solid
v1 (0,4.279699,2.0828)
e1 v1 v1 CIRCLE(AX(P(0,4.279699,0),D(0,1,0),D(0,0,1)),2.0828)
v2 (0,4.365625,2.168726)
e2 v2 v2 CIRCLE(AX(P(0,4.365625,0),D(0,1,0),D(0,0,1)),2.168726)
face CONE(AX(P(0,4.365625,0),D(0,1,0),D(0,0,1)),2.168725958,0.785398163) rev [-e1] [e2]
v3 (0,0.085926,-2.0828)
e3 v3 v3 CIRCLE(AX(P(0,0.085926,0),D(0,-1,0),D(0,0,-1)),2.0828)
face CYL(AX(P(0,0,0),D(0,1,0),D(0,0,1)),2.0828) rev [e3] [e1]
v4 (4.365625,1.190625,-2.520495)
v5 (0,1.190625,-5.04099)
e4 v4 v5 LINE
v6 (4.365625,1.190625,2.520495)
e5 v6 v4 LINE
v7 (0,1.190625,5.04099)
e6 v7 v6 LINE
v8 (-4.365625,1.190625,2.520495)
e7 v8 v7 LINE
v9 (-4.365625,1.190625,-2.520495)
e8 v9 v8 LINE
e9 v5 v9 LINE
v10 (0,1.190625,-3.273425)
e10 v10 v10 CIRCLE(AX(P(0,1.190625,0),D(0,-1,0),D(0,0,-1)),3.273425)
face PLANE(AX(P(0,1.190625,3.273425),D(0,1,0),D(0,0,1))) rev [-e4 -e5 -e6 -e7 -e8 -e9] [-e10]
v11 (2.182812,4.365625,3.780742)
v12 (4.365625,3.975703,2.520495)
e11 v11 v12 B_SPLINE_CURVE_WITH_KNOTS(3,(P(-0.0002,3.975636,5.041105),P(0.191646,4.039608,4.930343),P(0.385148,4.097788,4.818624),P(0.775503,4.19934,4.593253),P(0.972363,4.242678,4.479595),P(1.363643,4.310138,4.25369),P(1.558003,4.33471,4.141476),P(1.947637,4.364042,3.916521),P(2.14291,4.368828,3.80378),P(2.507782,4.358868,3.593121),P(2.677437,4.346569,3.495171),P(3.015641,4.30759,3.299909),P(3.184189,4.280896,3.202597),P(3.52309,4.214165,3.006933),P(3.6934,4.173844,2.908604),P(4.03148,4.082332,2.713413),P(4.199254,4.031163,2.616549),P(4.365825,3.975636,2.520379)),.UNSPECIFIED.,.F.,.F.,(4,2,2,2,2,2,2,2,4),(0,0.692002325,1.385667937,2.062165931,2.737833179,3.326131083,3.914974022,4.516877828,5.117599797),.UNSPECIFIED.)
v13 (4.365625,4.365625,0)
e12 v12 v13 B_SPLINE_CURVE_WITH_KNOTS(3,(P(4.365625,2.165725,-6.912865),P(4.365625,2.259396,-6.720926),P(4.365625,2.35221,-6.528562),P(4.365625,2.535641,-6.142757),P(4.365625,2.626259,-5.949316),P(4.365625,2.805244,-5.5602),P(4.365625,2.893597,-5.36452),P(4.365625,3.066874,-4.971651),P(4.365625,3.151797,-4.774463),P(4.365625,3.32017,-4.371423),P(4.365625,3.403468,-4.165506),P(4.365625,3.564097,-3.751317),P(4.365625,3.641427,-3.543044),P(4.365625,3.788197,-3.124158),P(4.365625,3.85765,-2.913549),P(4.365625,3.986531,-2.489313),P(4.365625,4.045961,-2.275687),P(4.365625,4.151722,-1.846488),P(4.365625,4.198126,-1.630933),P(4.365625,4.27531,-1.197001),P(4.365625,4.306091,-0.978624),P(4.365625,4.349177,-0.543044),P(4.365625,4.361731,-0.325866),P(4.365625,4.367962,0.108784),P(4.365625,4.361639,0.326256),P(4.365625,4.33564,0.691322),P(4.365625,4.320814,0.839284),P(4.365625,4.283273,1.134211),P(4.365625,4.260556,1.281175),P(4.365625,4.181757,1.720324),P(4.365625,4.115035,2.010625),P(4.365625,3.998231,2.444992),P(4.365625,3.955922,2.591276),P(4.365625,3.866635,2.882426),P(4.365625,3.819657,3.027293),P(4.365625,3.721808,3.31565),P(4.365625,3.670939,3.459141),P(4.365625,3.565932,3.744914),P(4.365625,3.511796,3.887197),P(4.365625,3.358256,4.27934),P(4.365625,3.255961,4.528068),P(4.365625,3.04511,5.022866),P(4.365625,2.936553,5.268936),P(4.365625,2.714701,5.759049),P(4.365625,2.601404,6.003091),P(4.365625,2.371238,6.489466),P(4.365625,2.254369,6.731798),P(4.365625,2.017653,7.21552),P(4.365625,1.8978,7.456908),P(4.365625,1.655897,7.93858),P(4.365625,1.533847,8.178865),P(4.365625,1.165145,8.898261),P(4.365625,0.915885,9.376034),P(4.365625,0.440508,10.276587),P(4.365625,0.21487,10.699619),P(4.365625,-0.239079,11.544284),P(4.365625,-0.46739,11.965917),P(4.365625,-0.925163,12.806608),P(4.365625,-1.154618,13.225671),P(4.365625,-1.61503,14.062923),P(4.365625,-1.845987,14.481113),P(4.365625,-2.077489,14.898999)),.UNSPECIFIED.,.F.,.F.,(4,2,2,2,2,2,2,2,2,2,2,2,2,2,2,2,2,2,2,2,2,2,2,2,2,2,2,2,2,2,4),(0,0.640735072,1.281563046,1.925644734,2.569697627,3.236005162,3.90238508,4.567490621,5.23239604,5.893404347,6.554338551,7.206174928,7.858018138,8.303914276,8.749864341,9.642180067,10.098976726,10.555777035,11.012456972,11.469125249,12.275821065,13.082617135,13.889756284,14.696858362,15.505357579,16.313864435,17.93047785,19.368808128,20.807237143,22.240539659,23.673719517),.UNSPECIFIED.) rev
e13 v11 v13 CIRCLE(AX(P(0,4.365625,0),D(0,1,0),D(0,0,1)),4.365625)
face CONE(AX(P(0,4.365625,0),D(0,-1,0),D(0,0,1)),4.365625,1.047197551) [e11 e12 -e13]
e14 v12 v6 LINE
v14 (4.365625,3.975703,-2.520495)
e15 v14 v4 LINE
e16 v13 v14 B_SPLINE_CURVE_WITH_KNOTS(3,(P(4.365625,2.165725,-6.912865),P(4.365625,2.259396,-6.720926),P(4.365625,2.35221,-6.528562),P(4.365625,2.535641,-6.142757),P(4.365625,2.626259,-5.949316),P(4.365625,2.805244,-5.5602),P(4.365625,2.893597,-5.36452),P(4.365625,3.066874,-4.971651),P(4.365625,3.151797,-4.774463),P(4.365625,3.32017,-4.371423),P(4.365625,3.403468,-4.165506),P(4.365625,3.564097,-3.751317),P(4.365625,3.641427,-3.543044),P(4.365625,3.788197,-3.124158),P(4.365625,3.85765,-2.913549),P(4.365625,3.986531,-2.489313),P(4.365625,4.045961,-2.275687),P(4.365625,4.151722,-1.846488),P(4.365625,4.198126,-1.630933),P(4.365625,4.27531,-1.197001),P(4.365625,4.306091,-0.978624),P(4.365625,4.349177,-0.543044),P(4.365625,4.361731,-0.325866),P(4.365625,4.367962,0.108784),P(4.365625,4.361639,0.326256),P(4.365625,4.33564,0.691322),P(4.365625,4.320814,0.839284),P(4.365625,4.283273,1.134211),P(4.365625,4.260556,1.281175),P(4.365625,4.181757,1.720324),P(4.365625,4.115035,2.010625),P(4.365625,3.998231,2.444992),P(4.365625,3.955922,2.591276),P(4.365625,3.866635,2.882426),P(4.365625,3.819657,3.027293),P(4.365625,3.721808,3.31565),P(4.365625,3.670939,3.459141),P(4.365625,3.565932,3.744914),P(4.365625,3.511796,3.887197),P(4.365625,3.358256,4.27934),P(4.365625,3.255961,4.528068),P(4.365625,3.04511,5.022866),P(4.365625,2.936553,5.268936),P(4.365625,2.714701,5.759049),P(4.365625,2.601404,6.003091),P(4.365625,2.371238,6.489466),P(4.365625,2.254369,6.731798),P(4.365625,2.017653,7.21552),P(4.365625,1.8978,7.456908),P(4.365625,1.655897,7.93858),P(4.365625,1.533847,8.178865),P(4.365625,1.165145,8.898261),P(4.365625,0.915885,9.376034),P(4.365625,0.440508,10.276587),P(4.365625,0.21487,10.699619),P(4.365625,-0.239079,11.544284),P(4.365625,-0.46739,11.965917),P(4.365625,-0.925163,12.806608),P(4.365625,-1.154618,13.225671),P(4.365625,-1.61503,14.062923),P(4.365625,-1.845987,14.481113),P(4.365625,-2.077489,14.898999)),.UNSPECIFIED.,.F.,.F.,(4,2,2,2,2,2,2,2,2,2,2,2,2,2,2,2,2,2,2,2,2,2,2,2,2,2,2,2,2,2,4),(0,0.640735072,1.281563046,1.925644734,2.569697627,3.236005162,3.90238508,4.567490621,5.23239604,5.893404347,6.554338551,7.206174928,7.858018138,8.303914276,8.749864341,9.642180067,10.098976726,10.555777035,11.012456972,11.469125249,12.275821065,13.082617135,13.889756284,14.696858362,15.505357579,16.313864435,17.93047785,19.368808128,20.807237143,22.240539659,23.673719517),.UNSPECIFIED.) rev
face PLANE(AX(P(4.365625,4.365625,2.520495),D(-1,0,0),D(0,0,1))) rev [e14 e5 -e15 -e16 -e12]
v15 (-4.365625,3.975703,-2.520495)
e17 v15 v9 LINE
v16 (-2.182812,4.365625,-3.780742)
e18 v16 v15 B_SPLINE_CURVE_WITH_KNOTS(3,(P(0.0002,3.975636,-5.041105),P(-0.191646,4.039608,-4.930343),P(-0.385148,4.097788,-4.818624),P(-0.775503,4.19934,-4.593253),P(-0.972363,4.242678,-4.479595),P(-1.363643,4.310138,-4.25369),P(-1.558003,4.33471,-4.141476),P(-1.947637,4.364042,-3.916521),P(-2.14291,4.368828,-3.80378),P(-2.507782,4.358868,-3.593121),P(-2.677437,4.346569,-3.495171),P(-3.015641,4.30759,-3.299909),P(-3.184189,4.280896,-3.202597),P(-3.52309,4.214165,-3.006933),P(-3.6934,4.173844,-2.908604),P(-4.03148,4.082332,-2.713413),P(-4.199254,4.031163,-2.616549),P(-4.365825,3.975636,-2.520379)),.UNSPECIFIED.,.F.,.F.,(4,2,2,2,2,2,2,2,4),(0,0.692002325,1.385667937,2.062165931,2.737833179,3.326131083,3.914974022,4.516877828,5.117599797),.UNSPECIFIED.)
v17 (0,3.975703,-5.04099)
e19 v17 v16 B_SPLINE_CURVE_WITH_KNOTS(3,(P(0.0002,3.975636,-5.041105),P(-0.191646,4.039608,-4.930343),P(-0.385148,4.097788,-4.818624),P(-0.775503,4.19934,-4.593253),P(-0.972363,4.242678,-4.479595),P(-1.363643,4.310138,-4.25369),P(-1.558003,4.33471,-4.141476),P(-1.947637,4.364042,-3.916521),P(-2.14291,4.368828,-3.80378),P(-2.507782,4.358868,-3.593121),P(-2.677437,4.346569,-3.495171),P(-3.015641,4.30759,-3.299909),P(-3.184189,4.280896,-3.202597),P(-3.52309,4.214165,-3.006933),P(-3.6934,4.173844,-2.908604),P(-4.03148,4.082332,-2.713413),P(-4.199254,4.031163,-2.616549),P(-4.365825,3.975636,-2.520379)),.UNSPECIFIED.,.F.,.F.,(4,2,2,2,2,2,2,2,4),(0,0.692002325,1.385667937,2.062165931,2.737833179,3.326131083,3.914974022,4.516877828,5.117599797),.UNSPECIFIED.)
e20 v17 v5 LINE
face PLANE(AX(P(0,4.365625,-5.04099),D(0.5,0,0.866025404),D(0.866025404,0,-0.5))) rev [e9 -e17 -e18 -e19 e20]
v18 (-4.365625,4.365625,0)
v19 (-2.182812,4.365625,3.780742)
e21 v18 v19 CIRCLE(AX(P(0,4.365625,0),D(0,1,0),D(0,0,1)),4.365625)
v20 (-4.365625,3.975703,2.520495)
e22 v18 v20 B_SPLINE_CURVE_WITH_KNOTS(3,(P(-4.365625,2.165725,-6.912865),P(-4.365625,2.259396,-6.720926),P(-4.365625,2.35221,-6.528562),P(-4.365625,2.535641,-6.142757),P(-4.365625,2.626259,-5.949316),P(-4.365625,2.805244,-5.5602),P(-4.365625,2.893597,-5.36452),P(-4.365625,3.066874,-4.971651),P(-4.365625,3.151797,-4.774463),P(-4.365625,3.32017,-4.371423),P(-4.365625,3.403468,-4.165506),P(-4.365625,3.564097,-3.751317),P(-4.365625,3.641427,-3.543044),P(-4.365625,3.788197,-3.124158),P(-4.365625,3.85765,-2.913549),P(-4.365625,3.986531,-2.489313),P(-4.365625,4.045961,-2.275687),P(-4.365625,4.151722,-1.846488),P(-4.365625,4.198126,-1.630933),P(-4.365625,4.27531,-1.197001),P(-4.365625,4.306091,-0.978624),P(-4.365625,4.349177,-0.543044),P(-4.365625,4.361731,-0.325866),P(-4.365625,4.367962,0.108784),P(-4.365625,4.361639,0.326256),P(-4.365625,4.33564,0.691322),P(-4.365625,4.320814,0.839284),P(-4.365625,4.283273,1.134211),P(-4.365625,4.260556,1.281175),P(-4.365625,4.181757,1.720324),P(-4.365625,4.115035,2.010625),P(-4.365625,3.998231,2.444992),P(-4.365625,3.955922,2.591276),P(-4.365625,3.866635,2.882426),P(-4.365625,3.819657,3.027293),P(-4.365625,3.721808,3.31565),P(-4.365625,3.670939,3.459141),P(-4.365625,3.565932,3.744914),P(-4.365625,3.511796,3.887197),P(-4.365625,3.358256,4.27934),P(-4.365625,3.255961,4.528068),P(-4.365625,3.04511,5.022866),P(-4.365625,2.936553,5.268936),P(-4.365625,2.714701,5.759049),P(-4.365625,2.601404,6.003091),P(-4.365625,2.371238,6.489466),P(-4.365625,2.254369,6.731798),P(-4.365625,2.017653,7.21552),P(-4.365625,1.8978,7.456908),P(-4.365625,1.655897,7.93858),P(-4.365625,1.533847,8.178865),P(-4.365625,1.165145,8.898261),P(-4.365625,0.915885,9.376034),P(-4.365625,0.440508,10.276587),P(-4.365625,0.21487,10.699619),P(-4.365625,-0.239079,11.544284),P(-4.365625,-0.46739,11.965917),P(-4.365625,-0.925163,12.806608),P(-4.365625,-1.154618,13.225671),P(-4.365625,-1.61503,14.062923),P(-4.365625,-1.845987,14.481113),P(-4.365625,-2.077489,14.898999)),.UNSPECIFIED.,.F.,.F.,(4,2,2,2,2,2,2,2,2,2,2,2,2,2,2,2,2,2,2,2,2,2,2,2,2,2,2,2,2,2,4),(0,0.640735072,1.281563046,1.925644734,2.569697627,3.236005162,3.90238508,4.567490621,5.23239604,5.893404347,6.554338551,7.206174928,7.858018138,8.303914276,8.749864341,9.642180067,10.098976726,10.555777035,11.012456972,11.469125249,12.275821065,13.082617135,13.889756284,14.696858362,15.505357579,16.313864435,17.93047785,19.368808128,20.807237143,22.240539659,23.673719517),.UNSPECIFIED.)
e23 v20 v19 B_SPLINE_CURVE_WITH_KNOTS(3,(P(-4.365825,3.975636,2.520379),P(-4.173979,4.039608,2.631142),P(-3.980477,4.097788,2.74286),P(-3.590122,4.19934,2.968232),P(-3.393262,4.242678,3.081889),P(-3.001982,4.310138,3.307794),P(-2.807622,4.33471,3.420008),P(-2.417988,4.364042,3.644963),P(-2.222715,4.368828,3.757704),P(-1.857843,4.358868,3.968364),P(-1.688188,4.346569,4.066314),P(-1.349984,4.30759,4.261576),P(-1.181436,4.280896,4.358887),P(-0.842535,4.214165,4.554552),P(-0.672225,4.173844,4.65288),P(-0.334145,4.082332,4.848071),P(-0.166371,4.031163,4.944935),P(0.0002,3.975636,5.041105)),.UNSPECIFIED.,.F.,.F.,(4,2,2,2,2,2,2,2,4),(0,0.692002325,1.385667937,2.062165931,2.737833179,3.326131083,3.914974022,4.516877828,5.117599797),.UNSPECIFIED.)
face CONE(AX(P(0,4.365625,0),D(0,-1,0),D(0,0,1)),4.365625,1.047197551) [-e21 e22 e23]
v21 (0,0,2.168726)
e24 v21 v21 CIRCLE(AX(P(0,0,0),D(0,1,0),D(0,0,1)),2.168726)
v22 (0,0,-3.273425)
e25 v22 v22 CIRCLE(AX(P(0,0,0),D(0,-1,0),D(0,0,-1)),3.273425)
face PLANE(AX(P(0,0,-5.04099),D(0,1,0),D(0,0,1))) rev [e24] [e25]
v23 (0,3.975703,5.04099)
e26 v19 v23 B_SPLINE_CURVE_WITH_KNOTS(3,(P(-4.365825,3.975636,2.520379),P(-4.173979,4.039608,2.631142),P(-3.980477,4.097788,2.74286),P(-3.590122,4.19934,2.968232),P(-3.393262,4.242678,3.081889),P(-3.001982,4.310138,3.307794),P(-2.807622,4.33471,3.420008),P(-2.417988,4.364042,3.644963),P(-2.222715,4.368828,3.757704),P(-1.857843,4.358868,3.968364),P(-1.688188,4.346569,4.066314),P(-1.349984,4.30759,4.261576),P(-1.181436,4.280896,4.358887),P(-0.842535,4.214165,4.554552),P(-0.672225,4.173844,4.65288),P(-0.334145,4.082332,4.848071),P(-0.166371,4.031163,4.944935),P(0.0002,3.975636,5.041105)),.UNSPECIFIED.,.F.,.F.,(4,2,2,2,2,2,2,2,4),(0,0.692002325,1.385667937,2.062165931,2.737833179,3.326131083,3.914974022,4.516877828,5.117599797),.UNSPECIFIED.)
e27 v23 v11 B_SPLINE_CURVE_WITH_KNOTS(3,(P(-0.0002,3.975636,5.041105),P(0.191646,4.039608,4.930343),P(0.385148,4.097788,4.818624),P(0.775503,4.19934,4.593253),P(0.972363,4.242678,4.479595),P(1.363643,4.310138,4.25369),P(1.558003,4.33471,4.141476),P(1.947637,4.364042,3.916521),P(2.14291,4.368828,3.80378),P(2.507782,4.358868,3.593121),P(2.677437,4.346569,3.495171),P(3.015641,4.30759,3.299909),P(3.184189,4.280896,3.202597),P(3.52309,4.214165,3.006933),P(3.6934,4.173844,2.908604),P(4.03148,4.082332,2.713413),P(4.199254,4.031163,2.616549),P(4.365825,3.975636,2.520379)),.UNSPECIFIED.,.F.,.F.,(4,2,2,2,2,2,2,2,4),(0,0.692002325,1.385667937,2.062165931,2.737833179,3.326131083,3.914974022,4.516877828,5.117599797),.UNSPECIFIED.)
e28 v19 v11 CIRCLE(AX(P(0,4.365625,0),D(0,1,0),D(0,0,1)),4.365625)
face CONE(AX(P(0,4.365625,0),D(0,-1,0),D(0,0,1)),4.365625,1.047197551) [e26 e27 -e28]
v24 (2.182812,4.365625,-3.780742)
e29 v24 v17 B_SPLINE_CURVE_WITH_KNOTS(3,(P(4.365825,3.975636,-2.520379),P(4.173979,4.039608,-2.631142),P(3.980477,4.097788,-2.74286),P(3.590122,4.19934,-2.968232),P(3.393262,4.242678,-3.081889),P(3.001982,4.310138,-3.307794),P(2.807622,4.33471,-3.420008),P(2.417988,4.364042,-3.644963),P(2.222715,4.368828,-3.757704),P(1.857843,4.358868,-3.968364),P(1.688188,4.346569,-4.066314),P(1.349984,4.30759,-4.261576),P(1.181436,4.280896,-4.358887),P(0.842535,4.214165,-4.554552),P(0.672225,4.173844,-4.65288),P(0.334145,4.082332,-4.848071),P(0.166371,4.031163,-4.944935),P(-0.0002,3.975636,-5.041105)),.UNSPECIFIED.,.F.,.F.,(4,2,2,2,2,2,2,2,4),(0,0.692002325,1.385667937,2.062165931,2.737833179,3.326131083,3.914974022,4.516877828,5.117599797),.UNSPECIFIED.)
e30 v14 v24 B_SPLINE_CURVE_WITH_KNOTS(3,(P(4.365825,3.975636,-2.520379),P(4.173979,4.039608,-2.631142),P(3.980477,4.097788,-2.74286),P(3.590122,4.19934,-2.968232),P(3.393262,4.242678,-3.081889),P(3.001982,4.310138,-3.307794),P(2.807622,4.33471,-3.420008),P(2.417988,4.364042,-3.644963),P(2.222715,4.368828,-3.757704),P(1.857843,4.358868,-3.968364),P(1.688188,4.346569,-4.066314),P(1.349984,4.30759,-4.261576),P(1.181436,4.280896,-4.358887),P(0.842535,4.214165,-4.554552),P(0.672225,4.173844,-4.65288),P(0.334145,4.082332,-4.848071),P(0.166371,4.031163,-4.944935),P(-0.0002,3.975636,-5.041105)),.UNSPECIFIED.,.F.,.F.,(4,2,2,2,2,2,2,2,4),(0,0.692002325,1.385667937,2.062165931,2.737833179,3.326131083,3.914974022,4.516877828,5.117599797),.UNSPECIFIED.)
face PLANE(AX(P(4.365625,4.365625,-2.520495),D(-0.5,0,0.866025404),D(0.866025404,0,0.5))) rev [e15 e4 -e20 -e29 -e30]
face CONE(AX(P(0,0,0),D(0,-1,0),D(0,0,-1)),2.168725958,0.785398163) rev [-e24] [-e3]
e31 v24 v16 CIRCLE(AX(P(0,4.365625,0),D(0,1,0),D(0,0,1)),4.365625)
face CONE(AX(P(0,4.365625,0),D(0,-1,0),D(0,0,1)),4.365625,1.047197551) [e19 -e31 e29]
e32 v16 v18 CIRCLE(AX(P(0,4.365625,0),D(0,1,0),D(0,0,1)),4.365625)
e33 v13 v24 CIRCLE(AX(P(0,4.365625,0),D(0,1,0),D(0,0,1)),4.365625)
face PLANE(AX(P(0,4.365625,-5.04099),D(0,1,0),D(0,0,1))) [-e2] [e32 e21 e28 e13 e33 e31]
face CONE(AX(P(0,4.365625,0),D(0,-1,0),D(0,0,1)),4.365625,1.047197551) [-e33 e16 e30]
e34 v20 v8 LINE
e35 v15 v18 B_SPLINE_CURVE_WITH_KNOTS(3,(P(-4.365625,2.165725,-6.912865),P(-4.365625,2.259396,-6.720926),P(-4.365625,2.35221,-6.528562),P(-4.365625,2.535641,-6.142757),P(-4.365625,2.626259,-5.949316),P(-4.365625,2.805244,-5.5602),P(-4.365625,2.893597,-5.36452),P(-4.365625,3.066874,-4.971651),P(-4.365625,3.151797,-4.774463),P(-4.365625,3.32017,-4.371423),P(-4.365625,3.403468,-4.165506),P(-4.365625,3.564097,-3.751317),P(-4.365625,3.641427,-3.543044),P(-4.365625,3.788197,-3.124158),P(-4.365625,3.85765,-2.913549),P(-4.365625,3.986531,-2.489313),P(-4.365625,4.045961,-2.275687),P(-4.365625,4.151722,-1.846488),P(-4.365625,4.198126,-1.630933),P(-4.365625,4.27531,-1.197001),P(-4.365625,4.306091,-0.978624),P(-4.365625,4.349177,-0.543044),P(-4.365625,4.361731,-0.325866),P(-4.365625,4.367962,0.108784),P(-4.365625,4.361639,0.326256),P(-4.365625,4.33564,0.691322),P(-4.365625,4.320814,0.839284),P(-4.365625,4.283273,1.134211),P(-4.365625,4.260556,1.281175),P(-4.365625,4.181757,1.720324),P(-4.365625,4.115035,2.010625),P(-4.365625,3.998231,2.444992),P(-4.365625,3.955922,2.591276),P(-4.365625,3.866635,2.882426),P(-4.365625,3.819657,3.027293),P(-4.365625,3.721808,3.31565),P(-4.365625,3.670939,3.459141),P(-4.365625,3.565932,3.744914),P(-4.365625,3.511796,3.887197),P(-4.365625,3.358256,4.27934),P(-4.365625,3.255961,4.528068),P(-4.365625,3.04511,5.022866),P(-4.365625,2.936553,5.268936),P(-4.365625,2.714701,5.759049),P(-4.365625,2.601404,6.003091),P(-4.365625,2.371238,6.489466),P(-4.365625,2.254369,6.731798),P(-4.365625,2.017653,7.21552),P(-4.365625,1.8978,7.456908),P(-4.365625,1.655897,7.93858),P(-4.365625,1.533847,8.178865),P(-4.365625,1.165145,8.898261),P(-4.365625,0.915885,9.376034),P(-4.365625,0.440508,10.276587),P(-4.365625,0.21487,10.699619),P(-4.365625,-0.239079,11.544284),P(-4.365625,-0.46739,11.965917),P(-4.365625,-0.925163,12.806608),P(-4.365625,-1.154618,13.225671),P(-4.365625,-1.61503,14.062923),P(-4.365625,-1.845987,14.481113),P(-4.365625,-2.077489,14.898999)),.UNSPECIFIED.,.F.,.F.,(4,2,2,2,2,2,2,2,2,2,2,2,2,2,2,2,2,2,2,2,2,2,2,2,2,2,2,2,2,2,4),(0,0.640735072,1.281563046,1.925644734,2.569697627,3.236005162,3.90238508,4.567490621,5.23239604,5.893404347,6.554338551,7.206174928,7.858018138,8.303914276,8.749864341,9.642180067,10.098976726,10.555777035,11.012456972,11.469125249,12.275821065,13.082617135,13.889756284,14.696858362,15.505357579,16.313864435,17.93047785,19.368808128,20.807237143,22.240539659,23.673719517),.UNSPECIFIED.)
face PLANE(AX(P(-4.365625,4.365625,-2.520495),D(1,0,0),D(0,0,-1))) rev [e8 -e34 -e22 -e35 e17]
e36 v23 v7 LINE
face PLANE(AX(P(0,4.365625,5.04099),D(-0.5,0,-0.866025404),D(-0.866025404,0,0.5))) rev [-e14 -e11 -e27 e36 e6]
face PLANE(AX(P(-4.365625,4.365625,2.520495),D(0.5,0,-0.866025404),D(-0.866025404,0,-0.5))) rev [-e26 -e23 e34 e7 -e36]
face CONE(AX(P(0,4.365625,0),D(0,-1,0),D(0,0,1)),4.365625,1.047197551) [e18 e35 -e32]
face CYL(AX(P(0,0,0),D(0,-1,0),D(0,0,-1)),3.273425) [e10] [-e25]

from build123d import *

# Parameters (mm, degrees)
BOSS_EXTRUDE1_DEPTH = 4.365625
SKETCH2_OUTSIDE_W   = 44.614
SKETCH2_OUTSIDE_H   = 45.964
SKETCH2_OUTSIDE_R   = 4.365625
CUT_EXTRUDE1_DEPTH  = 8.9705043
CUT_EXTRUDE1_DRAFT  = -60
SKETCH4_R           = 2.0828
CUT_EXTRUDE3_DEPTH  = 4.365625
SKETCH9_W           = 1.767564538
SKETCH9_H           = 1.190625


# Read off the part's stored shape, not the designer's step: Cut-Extrude4, Cut-Extrude5
with BuildPart() as part:
    # Sketch1 → Boss-Extrude1 (new body)
    with BuildSketch(Plane(origin=(0, 0, 0), x_dir=(1, 0, 0), z_dir=(0, 1, 0))):
        Polygon((0, 5.040989538), (-4.365625, 2.520494769), (-4.365625, -2.520494769), (0, -5.040989538), (4.365625, -2.520494769), (4.365625, 2.520494769), align=None)
    extrude(amount=BOSS_EXTRUDE1_DEPTH)


with BuildPart() as cut_extrude1_tool:
    # Sketch2 outside → Cut-Extrude1 (with draft: the straight prism first)
    with BuildSketch(Plane(origin=(0, 4.365625, 0), x_dir=(1, 0, 0), z_dir=(0, 1, 0))):
        Rectangle(SKETCH2_OUTSIDE_W, SKETCH2_OUTSIDE_H)
        Circle(SKETCH2_OUTSIDE_R, mode=Mode.SUBTRACT)
    extrude(amount=-CUT_EXTRUDE1_DEPTH)
    # Cut-Extrude1: the draft: its side faces are tilted about the plane it starts from
    cut_extrude1_sides = [cut_extrude1_tool.faces().sort_by_distance(p)[0] for p in [
        (0, -0.11962715, 22.982),
        (22.307, -0.11962715, 0),
        (0, -0.11962715, -22.982),
        (-22.307, -0.11962715, 0),
        (-4.365625, -0.11962715, 0),
    ]]
    draft(cut_extrude1_sides, Plane(origin=(0, 4.365625, 0), x_dir=(1, 0, 0), z_dir=(0, 1, 0)), CUT_EXTRUDE1_DRAFT)


with BuildPart() as part_1:
    add(part.part)

    # Cut-Extrude1: cut by cut_extrude1_tool
    add(cut_extrude1_tool.part, mode=Mode.SUBTRACT)

    # Sketch4 → Cut-Extrude3 (cut)
    with BuildSketch(Plane(origin=(0, 4.365625, 0), x_dir=(1, 0, 0), z_dir=(0, 1, 0))):
        with Locations(Location((0, 0, 0), (0, 0, 270))):
            Circle(SKETCH4_R)
    extrude(amount=-CUT_EXTRUDE3_DEPTH, mode=Mode.SUBTRACT)

    # Cut-Extrude4 outline → Cut-Extrude4 (revolve, cut)
    with BuildSketch(Plane.XY):
        Polygon((2.0828, 4.365625), (2.0828, 4.279699042), (2.168725958, 4.365625), align=None)
    revolve(axis=Axis((0, 0, 0), (0, 1, 0)), mode=Mode.SUBTRACT)

    # Cut-Extrude5 outline → Cut-Extrude5 (revolve, cut)
    with BuildSketch(Plane.XY):
        Polygon((2.168725958, 0), (2.0828, 0.085925958), (2.0828, 0), align=None)
    revolve(axis=Axis((0, 0, 0), (0, 1, 0)), mode=Mode.SUBTRACT)

    # Sketch9 → Cut-Revolve1 (revolve, cut)
    with BuildSketch(Plane(origin=(0, 0, 0), x_dir=(0, 0, -1), z_dir=(1, 0, 0)), mode=Mode.PRIVATE) as cut_revolve1_sk:
        with Locations((4.157207269, 0.5953125)):
            Rectangle(SKETCH9_W, SKETCH9_H)
    revolve(cut_revolve1_sk.sketch.rotate(Axis((0, 0, 0), (0, 1, 0)), 180), axis=Axis((0, 0, 0), (0, 1, 0)), mode=Mode.SUBTRACT)


solid = part_1.part
